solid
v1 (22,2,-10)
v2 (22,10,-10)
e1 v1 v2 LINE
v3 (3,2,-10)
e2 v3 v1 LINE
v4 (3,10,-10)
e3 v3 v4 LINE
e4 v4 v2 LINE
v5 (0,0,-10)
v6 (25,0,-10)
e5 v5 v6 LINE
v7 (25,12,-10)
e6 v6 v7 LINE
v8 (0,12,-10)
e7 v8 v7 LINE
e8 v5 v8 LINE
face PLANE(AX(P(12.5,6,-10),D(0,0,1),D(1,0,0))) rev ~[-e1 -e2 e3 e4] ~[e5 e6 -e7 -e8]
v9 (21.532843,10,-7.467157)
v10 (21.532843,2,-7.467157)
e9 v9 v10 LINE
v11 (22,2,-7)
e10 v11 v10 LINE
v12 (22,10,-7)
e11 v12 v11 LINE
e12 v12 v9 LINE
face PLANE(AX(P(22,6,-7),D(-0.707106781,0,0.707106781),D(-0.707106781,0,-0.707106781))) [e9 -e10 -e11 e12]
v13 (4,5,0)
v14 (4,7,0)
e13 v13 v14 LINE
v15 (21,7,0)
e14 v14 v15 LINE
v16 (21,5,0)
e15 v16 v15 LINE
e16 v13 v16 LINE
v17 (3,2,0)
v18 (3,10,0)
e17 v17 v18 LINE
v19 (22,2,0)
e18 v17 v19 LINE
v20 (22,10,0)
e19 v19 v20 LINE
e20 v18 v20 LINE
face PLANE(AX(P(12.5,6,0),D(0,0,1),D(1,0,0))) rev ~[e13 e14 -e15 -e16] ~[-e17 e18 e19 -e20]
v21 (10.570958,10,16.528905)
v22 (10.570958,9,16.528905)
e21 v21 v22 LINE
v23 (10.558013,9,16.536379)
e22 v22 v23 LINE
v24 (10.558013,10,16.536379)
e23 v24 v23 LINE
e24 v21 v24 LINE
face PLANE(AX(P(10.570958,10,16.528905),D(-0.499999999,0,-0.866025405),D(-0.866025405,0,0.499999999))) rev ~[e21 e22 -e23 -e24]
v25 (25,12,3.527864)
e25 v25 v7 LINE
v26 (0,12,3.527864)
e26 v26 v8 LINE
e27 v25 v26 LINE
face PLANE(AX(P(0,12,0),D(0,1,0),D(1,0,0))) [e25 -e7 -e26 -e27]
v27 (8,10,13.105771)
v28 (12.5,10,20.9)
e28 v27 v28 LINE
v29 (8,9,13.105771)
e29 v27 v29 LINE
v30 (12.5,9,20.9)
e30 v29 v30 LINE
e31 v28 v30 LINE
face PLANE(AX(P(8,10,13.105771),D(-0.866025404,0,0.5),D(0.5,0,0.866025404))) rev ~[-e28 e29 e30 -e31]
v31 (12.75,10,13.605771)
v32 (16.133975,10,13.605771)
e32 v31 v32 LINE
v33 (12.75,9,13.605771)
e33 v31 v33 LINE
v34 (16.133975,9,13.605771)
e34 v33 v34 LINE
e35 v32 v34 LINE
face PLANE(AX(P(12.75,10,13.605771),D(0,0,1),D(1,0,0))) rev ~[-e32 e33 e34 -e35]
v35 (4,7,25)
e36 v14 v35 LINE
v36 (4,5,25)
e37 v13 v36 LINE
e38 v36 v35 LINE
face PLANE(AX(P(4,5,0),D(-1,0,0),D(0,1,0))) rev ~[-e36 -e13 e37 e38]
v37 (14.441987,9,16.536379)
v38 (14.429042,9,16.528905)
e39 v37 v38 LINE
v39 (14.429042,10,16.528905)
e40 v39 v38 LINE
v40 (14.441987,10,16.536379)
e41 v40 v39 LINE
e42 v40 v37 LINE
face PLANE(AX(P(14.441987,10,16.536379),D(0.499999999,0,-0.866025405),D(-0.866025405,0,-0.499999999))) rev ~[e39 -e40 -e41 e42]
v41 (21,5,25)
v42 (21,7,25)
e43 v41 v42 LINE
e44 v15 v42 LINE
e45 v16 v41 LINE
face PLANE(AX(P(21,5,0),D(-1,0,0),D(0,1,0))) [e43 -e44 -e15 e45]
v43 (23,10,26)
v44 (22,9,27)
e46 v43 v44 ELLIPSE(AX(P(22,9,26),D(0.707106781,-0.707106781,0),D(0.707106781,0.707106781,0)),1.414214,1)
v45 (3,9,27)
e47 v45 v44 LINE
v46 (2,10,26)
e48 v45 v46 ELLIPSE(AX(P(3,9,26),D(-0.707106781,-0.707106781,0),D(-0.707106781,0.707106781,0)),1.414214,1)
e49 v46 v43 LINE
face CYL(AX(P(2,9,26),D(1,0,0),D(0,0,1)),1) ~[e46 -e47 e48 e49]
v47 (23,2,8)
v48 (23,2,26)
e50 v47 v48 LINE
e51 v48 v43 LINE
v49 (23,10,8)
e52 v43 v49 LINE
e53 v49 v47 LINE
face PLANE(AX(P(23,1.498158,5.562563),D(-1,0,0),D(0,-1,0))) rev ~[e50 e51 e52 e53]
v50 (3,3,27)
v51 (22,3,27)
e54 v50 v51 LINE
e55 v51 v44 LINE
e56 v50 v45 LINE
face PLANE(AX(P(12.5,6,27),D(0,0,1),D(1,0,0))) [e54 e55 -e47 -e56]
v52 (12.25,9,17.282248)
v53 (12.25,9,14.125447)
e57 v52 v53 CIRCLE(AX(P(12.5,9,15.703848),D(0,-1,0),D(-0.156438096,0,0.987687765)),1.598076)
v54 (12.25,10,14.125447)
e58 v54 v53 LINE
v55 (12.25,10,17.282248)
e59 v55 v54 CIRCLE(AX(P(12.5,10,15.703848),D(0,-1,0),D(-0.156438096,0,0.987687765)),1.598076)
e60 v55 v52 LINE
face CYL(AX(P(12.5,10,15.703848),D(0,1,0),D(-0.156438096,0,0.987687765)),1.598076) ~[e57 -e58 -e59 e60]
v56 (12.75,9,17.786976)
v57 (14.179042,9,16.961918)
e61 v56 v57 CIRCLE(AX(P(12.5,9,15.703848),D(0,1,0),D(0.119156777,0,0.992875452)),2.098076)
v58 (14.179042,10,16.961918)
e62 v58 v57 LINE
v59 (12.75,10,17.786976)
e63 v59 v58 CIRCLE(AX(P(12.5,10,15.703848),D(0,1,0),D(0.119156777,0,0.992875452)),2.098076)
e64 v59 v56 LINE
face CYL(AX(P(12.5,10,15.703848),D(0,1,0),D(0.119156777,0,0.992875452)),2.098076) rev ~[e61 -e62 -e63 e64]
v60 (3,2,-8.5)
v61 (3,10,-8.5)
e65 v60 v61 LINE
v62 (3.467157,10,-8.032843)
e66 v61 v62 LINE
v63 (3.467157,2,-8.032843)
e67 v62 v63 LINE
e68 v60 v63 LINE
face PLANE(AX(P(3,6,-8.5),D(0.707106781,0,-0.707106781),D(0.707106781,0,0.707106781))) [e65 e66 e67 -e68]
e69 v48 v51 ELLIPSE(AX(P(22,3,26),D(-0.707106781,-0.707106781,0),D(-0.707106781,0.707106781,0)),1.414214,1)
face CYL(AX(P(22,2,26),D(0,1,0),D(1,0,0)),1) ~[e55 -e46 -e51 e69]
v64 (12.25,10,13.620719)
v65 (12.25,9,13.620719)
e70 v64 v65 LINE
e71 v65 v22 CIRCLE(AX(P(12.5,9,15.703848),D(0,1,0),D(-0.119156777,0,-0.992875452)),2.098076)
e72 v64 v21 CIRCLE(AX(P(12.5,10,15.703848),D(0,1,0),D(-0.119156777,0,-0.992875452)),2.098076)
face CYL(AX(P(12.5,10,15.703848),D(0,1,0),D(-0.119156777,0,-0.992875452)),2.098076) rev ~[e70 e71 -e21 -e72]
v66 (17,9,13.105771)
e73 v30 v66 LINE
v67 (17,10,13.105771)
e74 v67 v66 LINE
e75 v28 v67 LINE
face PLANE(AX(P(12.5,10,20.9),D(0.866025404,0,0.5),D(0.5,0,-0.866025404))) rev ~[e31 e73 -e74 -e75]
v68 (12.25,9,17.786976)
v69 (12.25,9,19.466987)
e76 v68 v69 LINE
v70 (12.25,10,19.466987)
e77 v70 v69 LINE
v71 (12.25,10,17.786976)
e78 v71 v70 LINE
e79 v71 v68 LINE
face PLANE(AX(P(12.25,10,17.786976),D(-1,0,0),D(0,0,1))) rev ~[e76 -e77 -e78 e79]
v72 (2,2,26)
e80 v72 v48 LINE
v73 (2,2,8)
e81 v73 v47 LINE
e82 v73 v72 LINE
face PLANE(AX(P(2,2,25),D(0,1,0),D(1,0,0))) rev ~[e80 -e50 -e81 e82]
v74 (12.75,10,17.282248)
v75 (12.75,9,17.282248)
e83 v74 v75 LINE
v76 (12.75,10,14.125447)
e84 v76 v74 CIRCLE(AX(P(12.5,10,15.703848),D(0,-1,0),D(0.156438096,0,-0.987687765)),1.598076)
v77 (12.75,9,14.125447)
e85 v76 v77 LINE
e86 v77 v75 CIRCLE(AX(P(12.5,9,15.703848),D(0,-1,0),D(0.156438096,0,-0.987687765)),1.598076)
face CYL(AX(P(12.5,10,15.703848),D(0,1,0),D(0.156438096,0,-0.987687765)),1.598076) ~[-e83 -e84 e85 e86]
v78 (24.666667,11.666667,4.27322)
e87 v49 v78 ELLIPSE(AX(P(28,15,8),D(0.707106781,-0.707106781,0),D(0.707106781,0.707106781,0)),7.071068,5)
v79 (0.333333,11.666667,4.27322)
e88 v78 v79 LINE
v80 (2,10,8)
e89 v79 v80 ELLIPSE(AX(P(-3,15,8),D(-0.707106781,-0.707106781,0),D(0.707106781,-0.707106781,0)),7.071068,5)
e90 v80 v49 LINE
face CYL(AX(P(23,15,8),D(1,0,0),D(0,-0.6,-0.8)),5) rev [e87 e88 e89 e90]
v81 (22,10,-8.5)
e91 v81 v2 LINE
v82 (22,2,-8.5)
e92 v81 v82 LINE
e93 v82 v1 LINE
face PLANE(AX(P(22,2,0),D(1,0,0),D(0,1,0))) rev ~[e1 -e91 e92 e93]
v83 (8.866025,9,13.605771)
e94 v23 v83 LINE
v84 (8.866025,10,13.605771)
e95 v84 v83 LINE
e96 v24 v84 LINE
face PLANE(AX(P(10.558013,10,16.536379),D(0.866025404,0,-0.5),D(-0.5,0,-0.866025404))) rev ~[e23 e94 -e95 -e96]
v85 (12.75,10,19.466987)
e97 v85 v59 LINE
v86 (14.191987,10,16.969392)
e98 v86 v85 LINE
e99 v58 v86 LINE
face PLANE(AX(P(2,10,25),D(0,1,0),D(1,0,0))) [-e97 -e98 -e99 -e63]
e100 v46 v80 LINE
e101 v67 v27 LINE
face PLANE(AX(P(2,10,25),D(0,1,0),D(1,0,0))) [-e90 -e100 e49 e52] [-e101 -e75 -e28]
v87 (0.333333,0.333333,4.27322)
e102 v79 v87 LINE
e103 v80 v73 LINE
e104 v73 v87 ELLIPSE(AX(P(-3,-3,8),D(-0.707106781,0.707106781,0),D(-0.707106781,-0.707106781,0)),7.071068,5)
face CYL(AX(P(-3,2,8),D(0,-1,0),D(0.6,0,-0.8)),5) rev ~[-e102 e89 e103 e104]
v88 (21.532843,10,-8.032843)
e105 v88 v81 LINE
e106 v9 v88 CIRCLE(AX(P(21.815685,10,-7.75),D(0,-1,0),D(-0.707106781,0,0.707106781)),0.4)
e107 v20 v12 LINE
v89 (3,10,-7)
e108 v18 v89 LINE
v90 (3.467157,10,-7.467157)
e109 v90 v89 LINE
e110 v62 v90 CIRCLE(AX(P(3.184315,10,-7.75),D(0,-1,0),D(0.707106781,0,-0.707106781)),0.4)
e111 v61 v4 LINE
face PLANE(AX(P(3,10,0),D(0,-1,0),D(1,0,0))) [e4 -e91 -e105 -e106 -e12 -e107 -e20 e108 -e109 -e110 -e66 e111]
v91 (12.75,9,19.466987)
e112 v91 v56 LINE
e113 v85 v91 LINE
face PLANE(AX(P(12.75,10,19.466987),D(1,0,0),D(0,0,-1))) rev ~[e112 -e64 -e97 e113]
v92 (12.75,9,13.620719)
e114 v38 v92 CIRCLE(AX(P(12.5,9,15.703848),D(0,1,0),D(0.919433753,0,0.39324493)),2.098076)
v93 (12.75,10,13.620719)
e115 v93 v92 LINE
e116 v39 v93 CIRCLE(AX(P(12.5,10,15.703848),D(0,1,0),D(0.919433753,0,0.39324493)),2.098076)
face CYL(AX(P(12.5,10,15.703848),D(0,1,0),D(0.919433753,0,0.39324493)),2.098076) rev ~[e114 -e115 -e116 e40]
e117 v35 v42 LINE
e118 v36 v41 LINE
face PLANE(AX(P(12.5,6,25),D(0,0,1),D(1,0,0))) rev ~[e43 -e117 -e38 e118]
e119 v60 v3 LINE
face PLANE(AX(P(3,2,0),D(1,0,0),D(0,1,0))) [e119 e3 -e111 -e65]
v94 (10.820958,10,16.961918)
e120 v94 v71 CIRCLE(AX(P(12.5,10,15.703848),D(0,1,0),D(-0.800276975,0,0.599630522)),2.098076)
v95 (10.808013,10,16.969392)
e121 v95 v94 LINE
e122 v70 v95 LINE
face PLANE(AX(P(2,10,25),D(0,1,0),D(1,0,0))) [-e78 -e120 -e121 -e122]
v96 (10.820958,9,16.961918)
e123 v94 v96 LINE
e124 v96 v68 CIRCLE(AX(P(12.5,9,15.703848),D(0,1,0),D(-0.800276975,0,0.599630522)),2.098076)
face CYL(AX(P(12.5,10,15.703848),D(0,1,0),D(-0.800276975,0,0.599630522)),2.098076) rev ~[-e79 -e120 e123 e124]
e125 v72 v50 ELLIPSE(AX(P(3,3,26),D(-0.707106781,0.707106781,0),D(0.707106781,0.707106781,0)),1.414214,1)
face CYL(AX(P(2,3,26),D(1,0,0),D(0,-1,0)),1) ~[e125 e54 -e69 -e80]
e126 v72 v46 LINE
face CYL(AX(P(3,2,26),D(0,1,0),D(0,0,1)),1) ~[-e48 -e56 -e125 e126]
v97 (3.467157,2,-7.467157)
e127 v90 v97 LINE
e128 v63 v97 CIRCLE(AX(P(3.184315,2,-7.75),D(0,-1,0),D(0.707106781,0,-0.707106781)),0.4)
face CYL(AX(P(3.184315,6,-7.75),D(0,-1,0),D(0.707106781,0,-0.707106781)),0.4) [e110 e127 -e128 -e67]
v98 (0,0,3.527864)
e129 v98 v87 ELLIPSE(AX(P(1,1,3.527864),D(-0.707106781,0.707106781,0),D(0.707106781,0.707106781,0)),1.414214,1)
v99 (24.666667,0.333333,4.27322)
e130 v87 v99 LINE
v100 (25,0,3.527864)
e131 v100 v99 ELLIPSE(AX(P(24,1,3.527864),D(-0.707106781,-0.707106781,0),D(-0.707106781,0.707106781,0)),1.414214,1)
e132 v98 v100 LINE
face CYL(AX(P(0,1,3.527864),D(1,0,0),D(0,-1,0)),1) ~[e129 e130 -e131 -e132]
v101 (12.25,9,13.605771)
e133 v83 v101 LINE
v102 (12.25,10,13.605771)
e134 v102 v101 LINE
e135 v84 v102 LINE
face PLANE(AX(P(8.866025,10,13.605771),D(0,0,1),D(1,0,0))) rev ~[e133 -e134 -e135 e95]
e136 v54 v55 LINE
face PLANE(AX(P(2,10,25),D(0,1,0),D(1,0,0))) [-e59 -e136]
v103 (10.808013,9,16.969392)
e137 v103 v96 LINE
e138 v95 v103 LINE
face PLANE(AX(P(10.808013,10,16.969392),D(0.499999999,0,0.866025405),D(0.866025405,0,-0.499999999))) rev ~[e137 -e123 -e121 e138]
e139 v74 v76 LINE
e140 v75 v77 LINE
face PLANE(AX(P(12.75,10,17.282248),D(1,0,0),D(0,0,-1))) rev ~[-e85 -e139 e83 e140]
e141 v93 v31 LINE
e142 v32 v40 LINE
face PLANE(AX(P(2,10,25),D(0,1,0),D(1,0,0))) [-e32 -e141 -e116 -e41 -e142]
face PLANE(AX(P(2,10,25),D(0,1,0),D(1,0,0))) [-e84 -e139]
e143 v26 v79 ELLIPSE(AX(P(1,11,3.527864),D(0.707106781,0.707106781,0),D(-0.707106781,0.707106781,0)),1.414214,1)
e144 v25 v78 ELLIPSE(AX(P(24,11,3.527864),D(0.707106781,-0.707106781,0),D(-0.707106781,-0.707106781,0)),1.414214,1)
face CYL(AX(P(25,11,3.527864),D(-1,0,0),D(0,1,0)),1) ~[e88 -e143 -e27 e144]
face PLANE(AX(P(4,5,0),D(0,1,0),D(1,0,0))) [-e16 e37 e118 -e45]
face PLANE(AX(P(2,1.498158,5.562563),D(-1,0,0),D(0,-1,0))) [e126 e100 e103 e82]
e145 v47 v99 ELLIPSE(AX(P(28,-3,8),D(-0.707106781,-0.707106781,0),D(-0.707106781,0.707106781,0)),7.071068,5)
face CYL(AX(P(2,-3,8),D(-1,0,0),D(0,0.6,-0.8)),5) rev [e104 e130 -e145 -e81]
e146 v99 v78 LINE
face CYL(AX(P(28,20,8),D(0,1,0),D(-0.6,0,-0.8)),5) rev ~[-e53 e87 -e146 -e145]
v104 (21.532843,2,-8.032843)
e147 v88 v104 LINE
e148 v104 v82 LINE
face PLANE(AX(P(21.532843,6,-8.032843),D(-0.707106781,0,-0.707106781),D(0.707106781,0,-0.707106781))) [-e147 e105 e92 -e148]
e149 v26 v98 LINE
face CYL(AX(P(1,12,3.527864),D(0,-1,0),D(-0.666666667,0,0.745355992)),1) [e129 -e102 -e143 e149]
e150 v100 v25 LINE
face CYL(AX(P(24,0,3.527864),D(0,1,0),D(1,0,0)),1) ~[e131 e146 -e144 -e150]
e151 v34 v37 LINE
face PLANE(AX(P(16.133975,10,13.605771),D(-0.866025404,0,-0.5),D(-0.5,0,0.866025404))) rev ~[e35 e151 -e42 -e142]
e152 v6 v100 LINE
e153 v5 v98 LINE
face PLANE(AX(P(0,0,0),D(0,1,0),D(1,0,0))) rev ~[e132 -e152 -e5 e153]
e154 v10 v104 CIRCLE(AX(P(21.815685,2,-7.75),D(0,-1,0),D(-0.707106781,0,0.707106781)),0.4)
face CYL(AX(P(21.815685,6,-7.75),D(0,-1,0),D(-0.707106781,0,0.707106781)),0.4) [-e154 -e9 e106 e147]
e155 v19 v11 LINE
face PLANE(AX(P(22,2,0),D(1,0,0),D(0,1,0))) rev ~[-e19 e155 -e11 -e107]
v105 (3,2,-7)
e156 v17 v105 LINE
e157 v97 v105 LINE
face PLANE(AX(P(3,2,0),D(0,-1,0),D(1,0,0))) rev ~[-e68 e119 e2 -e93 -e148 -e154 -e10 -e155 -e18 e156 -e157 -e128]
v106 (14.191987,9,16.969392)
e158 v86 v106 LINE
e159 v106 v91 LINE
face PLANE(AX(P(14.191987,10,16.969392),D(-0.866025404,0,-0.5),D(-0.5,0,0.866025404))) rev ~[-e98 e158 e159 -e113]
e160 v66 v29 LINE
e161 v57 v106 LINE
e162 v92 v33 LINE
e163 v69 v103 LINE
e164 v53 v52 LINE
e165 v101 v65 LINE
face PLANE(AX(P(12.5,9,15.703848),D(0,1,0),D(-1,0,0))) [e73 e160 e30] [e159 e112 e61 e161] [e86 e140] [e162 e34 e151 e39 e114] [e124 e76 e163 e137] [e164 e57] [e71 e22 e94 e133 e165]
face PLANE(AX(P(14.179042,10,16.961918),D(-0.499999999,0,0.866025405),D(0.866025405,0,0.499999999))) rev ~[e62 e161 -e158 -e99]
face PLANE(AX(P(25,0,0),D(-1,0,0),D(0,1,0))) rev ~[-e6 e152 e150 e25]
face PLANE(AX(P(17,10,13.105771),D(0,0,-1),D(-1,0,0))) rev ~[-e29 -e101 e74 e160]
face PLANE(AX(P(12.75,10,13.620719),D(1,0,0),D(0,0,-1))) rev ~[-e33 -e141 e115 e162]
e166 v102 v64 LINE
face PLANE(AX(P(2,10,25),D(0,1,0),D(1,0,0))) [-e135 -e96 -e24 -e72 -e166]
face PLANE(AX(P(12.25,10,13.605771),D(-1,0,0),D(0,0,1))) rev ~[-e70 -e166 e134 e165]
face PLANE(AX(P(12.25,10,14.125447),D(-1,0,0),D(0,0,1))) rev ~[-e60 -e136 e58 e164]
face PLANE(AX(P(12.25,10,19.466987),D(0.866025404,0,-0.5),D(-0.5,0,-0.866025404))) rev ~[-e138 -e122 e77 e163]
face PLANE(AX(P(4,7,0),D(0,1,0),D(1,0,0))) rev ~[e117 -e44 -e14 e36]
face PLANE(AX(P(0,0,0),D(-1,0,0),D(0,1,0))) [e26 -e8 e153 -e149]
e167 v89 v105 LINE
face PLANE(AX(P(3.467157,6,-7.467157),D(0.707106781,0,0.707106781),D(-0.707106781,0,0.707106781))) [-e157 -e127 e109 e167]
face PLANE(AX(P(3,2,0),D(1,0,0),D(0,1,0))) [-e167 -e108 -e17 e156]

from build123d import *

# Parameters (mm, degrees)
F0_W           = 25
F0_H           = 12
F0_W_2         = 19
F0_H_2         = 8
F1_DEPTH       = 10
F2_W           = 21
F2_H           = 8
F2_W_2         = 17
F2_H_2         = 2
F3_DEPTH       = 25
F4_W           = 21
F4_H           = 8
F4_W_2         = 17
F4_H_2         = 2
F5_DEPTH       = 2
F6_W           = 25
F6_H           = 12
F7_DEPTH       = 4
F10_DEPTH      = 4
F10_DEPTH_BACK = 4
F11_T1_DEPTH   = 21
F11_T3_DEPTH   = 8
F11_T9_DEPTH   = 31
F11_T14_DEPTH  = 18
F11_T22_DEPTH  = 31
F11_T27_DEPTH  = 18
F11_T35_DEPTH  = 31
F11_T40_DEPTH  = 18
F11_T48_DEPTH  = 18
F11_T53_DEPTH  = 31
F12_R          = 1
F14_DEPTH      = 1


# Not quite as in the source:
# - a fillet or chamfer that OpenCascade refuses, or shapes differently, is made with other operations: its cross-section is extruded or revolved along the edge and cut away or added


with BuildPart() as f1:
    # F0 (on Top) → F1 (new body)
    with BuildSketch(Plane.XY):
        with Locations((12.5, 6)):
            Rectangle(F0_W, F0_H)
        with Locations((12.5, 6)):
            Rectangle(F0_W_2, F0_H_2, mode=Mode.SUBTRACT)
    extrude(amount=-F1_DEPTH)

    # F2 (on Top) → F3 (join)
    with BuildSketch(Plane.XY):
        with Locations((12.5, 6)):
            Rectangle(F2_W, F2_H)
        with Locations((12.5, 6)):
            Rectangle(F2_W_2, F2_H_2, mode=Mode.SUBTRACT)
    extrude(amount=F3_DEPTH)

    # F4 (on face) → F5 (join)
    with BuildSketch(Plane.XY.offset(25)):
        with Locations((12.5, 6)):
            Rectangle(F4_W, F4_H)
        with Locations((12.5, 6)):
            Rectangle(F4_W_2, F4_H_2, mode=Mode.SUBTRACT)
        with Locations((12.5, 6)):
            Rectangle(F4_W_2, F4_H_2)
    extrude(amount=F5_DEPTH)

    # F6 (on face) → F7 (join)
    with BuildSketch(Plane.XY):
        with Locations((12.5, 6)):
            Rectangle(F6_W, F6_H)
        Polygon((23, 2), (22, 2), (3, 2), (2, 2), (2, 10), (3, 10), (22, 10), (23, 10), align=None, mode=Mode.SUBTRACT)
    extrude(amount=F7_DEPTH)

    # F9 (on offset) → F10 (join, two sides)
    with BuildSketch(Plane.XZ.offset(-6)) as f10_sk:
        with BuildLine():
            Line((3, -7), (3, -8.5))
            Line((3, -8.5), (3.4671572875, -8.0328427125))
            ThreePointArc((3.4671572875, -8.0328427125), (3.5843145751, -7.75), (3.4671572875, -7.4671572875))
            Line((3.4671572875, -7.4671572875), (3, -7))
        make_face()
        with BuildLine():
            Line((21.5328427125, -8.0328427125), (22, -8.5))
            Line((22, -8.5), (22, -7))
            Line((22, -7), (21.5328427125, -7.4671572875))
            ThreePointArc((21.5328427125, -7.4671572875), (21.4156854249, -7.75), (21.5328427125, -8.0328427125))
        make_face()
    extrude(amount=F10_DEPTH)
    extrude(f10_sk.sketch, amount=-F10_DEPTH_BACK)

    # F11: fillet of radius 5 on 4 edges, made by hand

    # F11_s2 → F11_t1 (join)
    with BuildSketch(Plane.YZ.offset(2)):
        with BuildLine():
            ThreePointArc((0, 4), (1.472135955, 5.7639320225), (2, 8))
            Line((2, 8), (2, 4))
            Line((2, 4), (0, 4))
        make_face()
        with BuildLine():
            ThreePointArc((12, 4), (10.527864045, 5.7639320225), (10, 8))
            Line((10, 8), (10, 4))
            Line((10, 4), (12, 4))
        make_face()
    extrude(amount=F11_T1_DEPTH)

    # F11_s4 → F11_t3 (join)
    with BuildSketch(Plane.XZ.offset(-10)):
        with BuildLine():
            ThreePointArc((25, 4), (23.527864045, 5.7639320225), (23, 8))
            Line((23, 8), (23, 4))
            Line((23, 4), (25, 4))
        make_face()
        with BuildLine():
            ThreePointArc((0, 4), (1.472135955, 5.7639320225), (2, 8))
            Line((2, 8), (2, 4))
            Line((2, 4), (0, 4))
        make_face()
    extrude(amount=F11_T3_DEPTH)


with BuildPart() as f11_tool7:
    # F11_s8 → F11_t9 (new body)
    with BuildSketch(Plane.YZ.offset(-8)):
        with BuildLine():
            ThreePointArc((0, 4), (1.472135955, 5.7639320225), (2, 8))
            Line((2, 8), (2, 4))
            Line((2, 4), (0, 4))
        make_face()
    extrude(amount=F11_T9_DEPTH)

    split(bisect_by=Plane.YZ, keep=Keep.TOP)

    split(bisect_by=Plane.YZ.offset(2), keep=Keep.BOTTOM)


with BuildPart() as f11_tool12:
    # F11_s13 → F11_t14 (new body)
    with BuildSketch(Plane.XZ.offset(8)):
        with BuildLine():
            ThreePointArc((0, 4), (1.472135955, 5.7639320225), (2, 8))
            Line((2, 8), (2, 4))
            Line((2, 4), (0, 4))
        make_face()
    extrude(amount=-F11_T14_DEPTH)

    split(bisect_by=Plane.XZ, keep=Keep.BOTTOM)

    split(bisect_by=Plane.XZ.offset(-2), keep=Keep.TOP)


with BuildPart() as f11_tool7_1:
    add(f11_tool7.part)

    # F11_t17: intersect F11_tool12
    add(f11_tool12.part, mode=Mode.INTERSECT)


with BuildPart() as f1_1:
    add(f1.part)

    # F11_t5: union F11_tool7
    add(f11_tool7_1.part)


with BuildPart() as f11_tool20:
    # F11_s21 → F11_t22 (new body)
    with BuildSketch(Plane.YZ.offset(2)):
        with BuildLine():
            ThreePointArc((0, 4), (1.472135955, 5.7639320225), (2, 8))
            Line((2, 8), (2, 4))
            Line((2, 4), (0, 4))
        make_face()
    extrude(amount=F11_T22_DEPTH)

    split(bisect_by=Plane.YZ.offset(25), keep=Keep.BOTTOM)

    split(bisect_by=Plane.YZ.offset(23), keep=Keep.TOP)


with BuildPart() as f11_tool25:
    # F11_s26 → F11_t27 (new body)
    with BuildSketch(Plane.XZ.offset(-10)):
        with BuildLine():
            ThreePointArc((25, 4), (23.527864045, 5.7639320225), (23, 8))
            Line((23, 8), (23, 4))
            Line((23, 4), (25, 4))
        make_face()
    extrude(amount=F11_T27_DEPTH)

    split(bisect_by=Plane.XZ, keep=Keep.BOTTOM)

    split(bisect_by=Plane.XZ.offset(-2), keep=Keep.TOP)


with BuildPart() as f11_tool20_1:
    add(f11_tool20.part)

    # F11_t30: intersect F11_tool25
    add(f11_tool25.part, mode=Mode.INTERSECT)


with BuildPart() as f1_2:
    add(f1_1.part)

    # F11_t18: union F11_tool20
    add(f11_tool20_1.part)


with BuildPart() as f11_tool33:
    # F11_s34 → F11_t35 (new body)
    with BuildSketch(Plane.YZ.offset(33)):
        with BuildLine():
            ThreePointArc((12, 4), (10.527864045, 5.7639320225), (10, 8))
            Line((10, 8), (10, 4))
            Line((10, 4), (12, 4))
        make_face()
    extrude(amount=-F11_T35_DEPTH)

    split(bisect_by=Plane.YZ.offset(25), keep=Keep.BOTTOM)

    split(bisect_by=Plane.YZ.offset(23), keep=Keep.TOP)


with BuildPart() as f11_tool38:
    # F11_s39 → F11_t40 (new body)
    with BuildSketch(Plane.XZ.offset(-20)):
        with BuildLine():
            ThreePointArc((25, 4), (23.527864045, 5.7639320225), (23, 8))
            Line((23, 8), (23, 4))
            Line((23, 4), (25, 4))
        make_face()
    extrude(amount=F11_T40_DEPTH)

    split(bisect_by=Plane.XZ.offset(-12), keep=Keep.TOP)

    split(bisect_by=Plane.XZ.offset(-10), keep=Keep.BOTTOM)


with BuildPart() as f11_tool33_1:
    add(f11_tool33.part)

    # F11_t43: intersect F11_tool38
    add(f11_tool38.part, mode=Mode.INTERSECT)


with BuildPart() as f1_3:
    add(f1_2.part)

    # F11_t31: union F11_tool33
    add(f11_tool33_1.part)


with BuildPart() as f11_tool46:
    # F11_s47 → F11_t48 (new body)
    with BuildSketch(Plane.XZ.offset(-2)):
        with BuildLine():
            ThreePointArc((0, 4), (1.472135955, 5.7639320225), (2, 8))
            Line((2, 8), (2, 4))
            Line((2, 4), (0, 4))
        make_face()
    extrude(amount=-F11_T48_DEPTH)

    split(bisect_by=Plane.XZ.offset(-12), keep=Keep.TOP)

    split(bisect_by=Plane.XZ.offset(-10), keep=Keep.BOTTOM)


with BuildPart() as f11_tool51:
    # F11_s52 → F11_t53 (new body)
    with BuildSketch(Plane.YZ.offset(23)):
        with BuildLine():
            ThreePointArc((12, 4), (10.527864045, 5.7639320225), (10, 8))
            Line((10, 8), (10, 4))
            Line((10, 4), (12, 4))
        make_face()
    extrude(amount=-F11_T53_DEPTH)

    split(bisect_by=Plane.YZ, keep=Keep.TOP)

    split(bisect_by=Plane.YZ.offset(2), keep=Keep.BOTTOM)


with BuildPart() as f11_tool46_1:
    add(f11_tool46.part)

    # F11_t56: intersect F11_tool51
    add(f11_tool51.part, mode=Mode.INTERSECT)


with BuildPart() as f1_4:
    add(f1_3.part)

    # F11_t44: union F11_tool46
    add(f11_tool46_1.part)

    # F12
    f12_edges = [f1_4.edges().sort_by_distance(p)[0] for p in [
        (23, 6, 27),
        (12.5, 2, 27),
        (2, 6, 27),
        (12.5, 10, 27),
        (12.5, 12, 4),
        (25, 6, 4),
        (12.5, 0, 4),
        (0, 6, 4),
    ]]
    fillet(f12_edges, radius=F12_R)

    # F13 (on face) → F14 (cut)
    with BuildSketch(Plane(origin=(0, 10, 0), x_dir=(-1, 0, 0), z_dir=(0, 1, 0))):
        Polygon((-12.5, 20.9), (-17, 13.1057713659), (-8, 13.1057713659), align=None)
        with BuildLine():
            Line((-12.75, 13.6057713659), (-16.1339745962, 13.6057713659))
            Line((-16.1339745962, 13.6057713659), (-14.4419872981, 16.536379332))
            Line((-14.4419872981, 16.536379332), (-14.4290420842, 16.5289054093))
            ThreePointArc((-14.4290420842, 16.5289054093), (-14.3169872981, 14.6548094716), (-12.75, 13.6207192114))
            Line((-12.75, 13.6207192114), (-12.75, 13.6057713659))
        make_face(mode=Mode.SUBTRACT)
        with BuildLine():
            ThreePointArc((-12.75, 14.125447255), (-14.0980762114, 15.7038475773), (-12.75, 17.2822478995))
            Line((-12.75, 17.2822478995), (-12.75, 14.125447255))
        make_face(mode=Mode.SUBTRACT)
        with BuildLine():
            ThreePointArc((-12.25, 17.2822478995), (-10.9019237886, 15.7038475773), (-12.25, 14.125447255))
            Line((-12.25, 14.125447255), (-12.25, 17.2822478995))
        make_face(mode=Mode.SUBTRACT)
        with BuildLine():
            Line((-8.8660254038, 13.6057713659), (-12.25, 13.6057713659))
            Line((-12.25, 13.6057713659), (-12.25, 13.6207192114))
            ThreePointArc((-12.25, 13.6207192114), (-10.6830127019, 14.6548094716), (-10.5709579158, 16.5289054093))
            Line((-10.5709579158, 16.5289054093), (-10.5580127019, 16.536379332))
            Line((-10.5580127019, 16.536379332), (-8.8660254038, 13.6057713659))
        make_face(mode=Mode.SUBTRACT)
        with BuildLine():
            Line((-12.75, 19.4669872981), (-12.75, 17.7869759432))
            ThreePointArc((-12.75, 17.7869759432), (-13.5490381057, 17.5208348754), (-14.1790420842, 16.9619181112))
            Line((-14.1790420842, 16.9619181112), (-14.1919872981, 16.9693920339))
            Line((-14.1919872981, 16.9693920339), (-12.75, 19.4669872981))
        make_face(mode=Mode.SUBTRACT)
        with BuildLine():
            Line((-12.25, 17.7869759432), (-12.25, 19.4669872981))
            Line((-12.25, 19.4669872981), (-10.8080127019, 16.9693920339))
            Line((-10.8080127019, 16.9693920339), (-10.8209579158, 16.9619181112))
            ThreePointArc((-10.8209579158, 16.9619181112), (-11.4509618943, 17.5208348754), (-12.25, 17.7869759432))
        make_face(mode=Mode.SUBTRACT)
    extrude(amount=-F14_DEPTH, mode=Mode.SUBTRACT)


solid = f1_4.part
